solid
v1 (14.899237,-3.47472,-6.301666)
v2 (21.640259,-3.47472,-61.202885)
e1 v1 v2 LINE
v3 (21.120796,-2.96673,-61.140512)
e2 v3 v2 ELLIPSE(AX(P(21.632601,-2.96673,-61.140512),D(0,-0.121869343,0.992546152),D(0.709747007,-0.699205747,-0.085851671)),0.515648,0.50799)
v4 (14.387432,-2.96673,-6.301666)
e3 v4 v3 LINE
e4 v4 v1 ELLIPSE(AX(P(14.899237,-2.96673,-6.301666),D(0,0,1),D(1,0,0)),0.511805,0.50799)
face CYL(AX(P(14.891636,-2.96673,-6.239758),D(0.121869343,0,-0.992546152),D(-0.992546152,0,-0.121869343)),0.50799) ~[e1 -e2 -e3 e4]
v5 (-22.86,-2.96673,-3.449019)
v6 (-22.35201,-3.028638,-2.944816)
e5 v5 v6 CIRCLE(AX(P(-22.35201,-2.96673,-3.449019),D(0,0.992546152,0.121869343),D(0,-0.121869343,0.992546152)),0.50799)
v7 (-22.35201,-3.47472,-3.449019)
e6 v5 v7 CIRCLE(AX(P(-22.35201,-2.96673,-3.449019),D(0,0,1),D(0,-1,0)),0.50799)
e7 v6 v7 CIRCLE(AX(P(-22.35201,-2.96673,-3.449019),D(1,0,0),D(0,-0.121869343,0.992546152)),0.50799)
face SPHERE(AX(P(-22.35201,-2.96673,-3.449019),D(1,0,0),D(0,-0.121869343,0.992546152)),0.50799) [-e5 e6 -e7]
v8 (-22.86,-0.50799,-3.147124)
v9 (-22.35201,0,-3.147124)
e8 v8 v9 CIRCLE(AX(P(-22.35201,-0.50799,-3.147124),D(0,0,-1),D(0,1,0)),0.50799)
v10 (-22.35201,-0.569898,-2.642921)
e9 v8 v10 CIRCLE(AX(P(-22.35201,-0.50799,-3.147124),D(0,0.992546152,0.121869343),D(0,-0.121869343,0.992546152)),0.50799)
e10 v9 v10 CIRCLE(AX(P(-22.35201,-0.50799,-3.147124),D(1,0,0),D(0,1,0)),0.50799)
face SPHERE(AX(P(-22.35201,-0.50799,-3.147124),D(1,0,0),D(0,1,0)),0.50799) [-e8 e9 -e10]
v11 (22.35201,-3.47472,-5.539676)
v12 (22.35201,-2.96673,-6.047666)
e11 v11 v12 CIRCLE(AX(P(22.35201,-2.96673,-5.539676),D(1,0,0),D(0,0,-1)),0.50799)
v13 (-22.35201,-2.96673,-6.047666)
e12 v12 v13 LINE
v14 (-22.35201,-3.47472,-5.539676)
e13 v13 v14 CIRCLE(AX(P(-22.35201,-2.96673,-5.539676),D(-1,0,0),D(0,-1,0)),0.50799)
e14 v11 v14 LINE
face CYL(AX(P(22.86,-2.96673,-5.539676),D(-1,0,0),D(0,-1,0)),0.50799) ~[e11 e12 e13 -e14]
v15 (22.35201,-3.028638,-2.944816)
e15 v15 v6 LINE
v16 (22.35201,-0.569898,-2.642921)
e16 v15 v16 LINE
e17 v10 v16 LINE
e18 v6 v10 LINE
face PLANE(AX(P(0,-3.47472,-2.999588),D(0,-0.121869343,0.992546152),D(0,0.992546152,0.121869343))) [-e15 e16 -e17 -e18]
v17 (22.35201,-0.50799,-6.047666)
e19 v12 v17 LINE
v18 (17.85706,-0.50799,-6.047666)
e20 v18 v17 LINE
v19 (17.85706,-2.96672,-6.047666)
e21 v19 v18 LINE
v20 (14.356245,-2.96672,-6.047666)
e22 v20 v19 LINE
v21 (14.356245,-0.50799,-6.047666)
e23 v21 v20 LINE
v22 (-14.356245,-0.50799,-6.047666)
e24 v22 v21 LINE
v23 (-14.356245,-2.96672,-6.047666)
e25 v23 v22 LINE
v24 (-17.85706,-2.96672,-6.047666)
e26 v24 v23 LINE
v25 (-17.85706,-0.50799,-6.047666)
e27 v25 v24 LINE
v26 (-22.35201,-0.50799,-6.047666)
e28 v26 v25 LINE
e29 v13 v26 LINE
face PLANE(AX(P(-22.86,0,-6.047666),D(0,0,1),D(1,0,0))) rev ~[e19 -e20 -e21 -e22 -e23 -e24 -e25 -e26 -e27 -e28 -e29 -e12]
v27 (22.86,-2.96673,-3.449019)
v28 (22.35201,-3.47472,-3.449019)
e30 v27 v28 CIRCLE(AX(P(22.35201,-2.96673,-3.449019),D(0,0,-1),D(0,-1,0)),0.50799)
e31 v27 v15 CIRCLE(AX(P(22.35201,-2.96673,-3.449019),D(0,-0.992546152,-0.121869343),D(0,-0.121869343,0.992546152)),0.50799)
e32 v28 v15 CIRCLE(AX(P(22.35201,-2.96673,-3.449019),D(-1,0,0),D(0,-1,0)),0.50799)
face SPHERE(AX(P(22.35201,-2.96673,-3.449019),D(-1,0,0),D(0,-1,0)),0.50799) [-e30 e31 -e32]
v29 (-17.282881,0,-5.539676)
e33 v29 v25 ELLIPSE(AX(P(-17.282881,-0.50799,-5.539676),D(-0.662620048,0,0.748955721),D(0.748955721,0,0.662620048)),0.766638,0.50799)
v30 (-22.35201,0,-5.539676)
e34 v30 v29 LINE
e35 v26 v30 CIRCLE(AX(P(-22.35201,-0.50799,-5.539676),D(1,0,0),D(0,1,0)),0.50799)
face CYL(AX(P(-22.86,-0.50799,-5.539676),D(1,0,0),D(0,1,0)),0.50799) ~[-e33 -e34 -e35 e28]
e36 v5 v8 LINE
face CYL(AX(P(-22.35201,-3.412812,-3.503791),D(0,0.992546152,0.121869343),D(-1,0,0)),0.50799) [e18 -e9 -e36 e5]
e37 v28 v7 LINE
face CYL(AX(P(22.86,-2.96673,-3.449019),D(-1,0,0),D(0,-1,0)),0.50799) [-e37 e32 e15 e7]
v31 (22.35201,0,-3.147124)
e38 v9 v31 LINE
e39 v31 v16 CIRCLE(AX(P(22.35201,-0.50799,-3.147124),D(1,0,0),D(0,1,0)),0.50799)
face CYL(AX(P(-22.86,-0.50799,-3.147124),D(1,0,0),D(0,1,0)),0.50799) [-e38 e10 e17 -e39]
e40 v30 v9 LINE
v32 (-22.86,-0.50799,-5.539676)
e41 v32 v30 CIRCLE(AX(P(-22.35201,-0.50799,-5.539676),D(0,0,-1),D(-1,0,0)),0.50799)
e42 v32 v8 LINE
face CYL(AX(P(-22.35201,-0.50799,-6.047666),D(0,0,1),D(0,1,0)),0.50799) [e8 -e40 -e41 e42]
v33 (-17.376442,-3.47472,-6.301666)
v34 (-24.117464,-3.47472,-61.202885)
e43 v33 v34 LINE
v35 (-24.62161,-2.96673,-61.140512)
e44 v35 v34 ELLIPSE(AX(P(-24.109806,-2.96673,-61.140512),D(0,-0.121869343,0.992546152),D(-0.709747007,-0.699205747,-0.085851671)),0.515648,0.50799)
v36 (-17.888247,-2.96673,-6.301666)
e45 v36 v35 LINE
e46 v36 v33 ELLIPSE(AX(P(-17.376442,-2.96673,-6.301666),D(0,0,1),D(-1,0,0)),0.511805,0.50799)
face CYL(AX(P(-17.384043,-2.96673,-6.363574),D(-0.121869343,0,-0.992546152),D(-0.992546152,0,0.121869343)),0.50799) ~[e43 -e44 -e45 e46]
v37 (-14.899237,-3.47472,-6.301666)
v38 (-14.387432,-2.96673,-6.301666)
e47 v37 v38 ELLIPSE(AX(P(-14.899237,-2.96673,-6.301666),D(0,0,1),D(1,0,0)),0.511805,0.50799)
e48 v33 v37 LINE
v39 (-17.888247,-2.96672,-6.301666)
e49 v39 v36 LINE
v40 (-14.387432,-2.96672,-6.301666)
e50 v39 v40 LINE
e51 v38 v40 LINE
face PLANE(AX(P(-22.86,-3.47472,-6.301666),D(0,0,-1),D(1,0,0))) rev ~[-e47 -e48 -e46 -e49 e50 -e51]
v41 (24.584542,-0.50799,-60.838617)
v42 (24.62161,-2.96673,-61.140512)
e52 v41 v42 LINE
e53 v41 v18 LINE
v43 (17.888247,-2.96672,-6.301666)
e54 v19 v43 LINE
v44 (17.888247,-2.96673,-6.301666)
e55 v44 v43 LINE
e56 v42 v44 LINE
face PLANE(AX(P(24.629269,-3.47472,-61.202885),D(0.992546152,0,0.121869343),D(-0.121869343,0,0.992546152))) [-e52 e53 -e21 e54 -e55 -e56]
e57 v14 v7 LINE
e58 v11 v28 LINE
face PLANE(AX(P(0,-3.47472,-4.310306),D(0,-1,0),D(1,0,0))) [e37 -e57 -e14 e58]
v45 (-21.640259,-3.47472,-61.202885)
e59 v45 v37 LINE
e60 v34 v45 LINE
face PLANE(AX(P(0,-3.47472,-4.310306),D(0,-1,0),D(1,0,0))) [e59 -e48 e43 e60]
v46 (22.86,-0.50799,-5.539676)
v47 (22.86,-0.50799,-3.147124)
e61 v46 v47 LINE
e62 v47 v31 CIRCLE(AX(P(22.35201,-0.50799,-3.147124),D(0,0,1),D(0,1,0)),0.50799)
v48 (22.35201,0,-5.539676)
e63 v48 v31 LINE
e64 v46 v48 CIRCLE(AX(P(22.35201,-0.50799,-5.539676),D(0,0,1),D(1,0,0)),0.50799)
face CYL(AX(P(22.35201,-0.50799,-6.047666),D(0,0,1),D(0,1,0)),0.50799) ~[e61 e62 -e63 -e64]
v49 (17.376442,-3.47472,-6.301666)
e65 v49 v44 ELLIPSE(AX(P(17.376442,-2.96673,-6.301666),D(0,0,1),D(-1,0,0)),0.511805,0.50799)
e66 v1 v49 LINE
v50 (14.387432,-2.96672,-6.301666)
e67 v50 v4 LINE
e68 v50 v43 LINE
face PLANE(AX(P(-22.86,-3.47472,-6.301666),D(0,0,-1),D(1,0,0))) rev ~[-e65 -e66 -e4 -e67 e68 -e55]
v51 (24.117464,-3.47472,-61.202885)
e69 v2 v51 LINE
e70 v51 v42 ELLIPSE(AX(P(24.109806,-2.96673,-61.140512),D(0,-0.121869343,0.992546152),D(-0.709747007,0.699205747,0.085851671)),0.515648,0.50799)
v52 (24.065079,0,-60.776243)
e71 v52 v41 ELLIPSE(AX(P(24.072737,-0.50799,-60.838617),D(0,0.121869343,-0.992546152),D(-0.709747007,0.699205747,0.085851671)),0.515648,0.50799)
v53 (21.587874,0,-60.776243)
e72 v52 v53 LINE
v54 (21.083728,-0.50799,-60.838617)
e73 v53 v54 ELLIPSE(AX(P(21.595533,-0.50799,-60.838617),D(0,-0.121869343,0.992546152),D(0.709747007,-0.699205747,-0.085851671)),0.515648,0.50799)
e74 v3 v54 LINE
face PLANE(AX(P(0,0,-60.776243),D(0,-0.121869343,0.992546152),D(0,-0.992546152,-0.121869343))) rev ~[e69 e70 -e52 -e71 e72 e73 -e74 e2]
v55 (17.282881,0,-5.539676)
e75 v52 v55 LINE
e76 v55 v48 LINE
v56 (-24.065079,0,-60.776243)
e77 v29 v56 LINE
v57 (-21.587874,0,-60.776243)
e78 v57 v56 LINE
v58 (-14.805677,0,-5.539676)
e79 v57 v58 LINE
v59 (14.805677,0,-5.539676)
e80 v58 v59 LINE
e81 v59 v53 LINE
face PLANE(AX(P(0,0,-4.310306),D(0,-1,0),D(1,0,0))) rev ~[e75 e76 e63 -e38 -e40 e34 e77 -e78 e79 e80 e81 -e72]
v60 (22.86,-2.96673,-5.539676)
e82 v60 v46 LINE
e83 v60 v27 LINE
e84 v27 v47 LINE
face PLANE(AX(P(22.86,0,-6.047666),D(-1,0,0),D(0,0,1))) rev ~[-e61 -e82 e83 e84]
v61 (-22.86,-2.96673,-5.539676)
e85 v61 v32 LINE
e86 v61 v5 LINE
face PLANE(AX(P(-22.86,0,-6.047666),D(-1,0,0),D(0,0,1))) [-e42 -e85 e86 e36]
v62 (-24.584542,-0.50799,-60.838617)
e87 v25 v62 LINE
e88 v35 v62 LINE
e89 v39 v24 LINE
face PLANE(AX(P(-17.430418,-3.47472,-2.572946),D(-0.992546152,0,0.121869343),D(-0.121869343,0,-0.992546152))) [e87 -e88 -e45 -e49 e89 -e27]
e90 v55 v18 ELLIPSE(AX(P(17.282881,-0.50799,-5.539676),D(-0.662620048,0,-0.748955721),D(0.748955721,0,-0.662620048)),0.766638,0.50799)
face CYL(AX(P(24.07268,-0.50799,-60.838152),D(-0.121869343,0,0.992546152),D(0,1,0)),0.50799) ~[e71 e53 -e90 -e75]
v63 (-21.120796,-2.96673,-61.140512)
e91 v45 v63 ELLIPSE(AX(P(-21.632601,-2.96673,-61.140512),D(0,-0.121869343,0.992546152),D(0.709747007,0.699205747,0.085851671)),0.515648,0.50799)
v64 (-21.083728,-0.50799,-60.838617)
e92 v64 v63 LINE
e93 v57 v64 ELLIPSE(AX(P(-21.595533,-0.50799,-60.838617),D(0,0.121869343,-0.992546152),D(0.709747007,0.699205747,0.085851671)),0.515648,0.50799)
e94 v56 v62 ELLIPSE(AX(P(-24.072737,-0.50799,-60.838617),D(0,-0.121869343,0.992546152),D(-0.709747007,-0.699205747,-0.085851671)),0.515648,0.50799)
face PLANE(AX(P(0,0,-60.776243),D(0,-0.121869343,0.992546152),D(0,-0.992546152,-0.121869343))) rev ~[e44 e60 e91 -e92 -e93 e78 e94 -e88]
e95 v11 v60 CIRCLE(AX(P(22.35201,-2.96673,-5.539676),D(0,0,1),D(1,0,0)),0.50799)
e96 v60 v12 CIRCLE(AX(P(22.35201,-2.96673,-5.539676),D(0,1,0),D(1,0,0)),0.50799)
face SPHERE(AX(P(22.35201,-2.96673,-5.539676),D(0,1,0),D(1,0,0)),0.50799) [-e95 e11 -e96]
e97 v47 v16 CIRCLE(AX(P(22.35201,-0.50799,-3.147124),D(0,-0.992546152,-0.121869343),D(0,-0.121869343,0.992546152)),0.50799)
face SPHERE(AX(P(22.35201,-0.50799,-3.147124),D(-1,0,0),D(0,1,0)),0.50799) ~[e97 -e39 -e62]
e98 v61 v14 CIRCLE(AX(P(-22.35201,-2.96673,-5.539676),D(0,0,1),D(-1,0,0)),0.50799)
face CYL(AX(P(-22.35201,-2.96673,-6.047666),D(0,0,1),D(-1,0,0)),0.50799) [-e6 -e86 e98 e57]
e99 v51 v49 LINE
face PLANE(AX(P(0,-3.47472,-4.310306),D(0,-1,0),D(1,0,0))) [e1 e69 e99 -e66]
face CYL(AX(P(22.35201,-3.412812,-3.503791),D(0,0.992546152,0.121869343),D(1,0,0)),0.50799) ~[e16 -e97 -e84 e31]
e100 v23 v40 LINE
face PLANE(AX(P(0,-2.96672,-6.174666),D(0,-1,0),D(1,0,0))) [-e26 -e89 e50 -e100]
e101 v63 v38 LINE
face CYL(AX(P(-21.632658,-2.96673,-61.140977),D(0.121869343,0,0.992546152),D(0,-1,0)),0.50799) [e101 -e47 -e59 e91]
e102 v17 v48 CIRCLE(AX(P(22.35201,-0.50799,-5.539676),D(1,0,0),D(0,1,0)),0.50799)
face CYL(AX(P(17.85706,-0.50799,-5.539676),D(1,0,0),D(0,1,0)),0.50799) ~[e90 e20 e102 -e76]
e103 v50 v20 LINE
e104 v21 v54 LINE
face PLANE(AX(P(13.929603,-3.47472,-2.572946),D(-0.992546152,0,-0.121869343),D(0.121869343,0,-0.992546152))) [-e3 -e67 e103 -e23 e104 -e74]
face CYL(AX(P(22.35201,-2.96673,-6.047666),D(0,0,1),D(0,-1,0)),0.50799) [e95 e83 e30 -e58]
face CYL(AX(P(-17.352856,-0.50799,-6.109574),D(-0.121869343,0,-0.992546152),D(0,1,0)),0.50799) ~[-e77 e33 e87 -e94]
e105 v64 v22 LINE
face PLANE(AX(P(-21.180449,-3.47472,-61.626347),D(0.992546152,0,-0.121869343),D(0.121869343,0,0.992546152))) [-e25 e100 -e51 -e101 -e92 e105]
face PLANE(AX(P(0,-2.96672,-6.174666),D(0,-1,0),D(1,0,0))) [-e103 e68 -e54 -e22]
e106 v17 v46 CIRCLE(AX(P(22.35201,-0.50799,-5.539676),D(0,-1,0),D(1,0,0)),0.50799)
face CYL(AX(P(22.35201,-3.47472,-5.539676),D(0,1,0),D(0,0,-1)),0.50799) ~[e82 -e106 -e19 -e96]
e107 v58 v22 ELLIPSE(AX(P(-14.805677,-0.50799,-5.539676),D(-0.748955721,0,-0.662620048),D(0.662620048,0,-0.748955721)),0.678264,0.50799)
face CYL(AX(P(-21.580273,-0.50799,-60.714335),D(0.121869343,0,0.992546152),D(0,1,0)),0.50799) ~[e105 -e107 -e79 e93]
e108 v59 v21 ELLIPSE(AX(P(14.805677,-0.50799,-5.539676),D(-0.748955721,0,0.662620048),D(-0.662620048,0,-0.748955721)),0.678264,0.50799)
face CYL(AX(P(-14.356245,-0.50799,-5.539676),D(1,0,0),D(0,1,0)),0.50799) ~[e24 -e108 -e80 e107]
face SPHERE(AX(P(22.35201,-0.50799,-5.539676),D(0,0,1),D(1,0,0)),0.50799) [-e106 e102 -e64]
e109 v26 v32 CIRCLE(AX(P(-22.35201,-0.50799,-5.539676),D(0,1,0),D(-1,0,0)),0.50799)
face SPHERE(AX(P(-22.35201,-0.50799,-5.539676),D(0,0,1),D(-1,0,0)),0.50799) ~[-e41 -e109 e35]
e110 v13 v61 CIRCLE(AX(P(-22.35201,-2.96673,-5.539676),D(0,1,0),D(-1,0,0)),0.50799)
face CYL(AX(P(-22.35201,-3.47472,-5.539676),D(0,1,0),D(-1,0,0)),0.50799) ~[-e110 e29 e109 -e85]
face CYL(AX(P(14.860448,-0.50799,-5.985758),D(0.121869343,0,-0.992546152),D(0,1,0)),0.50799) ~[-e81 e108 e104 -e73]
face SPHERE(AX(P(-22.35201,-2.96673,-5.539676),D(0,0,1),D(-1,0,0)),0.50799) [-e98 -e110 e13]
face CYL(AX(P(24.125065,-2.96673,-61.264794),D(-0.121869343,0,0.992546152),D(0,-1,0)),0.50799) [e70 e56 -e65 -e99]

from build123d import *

# Parameters (mm, degrees)
F0_W     = 45.72
F0_H     = 3.47472
F1_DEPTH = 3.47472
F3_DEPTH = 3.47472
F5_DEPTH = 38.1
F6_W     = 45.72
F6_H     = 0.254
F7_DEPTH = 0.508
F8_R     = 0.50799


# Not quite as in the source:
# - a fillet or chamfer is up to 0.001 mm smaller than in the source, because OpenCascade refuses the exact size


with BuildPart() as f1:
    # F0 (on Front) → F1 (new body)
    with BuildSketch(Plane.XZ):
        with Locations((0, -4.3103059118)):
            Rectangle(F0_W, F0_H)
    extrude(amount=F1_DEPTH)

    # F2 (on face) → F3 (join)
    with BuildSketch(Plane.XZ.offset(3.47472)):
        Polygon((-13.929602997, -2.5729459118), (-17.4304175377, -2.5729459118), (-24.6292689013, -61.2028853004), (-21.1804489373, -61.6263471453), align=None)
        Polygon((21.1804489373, -61.6263471453), (24.6292689013, -61.2028853004), (17.4304175377, -2.5729459118), (13.929602997, -2.5729459118), align=None)
    extrude(amount=-F3_DEPTH)

    # F4 (on Right) → F5 (cut, symmetric)
    with BuildSketch(Plane.YZ):
        Polygon((-3.47472, -2.9995878813), (0, -2.5729459118), (-3.47472, -2.5729459118), align=None)
        Polygon((0, -60.7762433309), (-3.47472, -61.2028853004), (-3.47472, -61.962287873), (0, -61.962287873), align=None)
    extrude(amount=F5_DEPTH, both=True, mode=Mode.SUBTRACT)

    # F6 (on face) → F7 (cut)
    with BuildSketch(Plane.XZ.offset(3.47472)):
        with Locations((0, -6.1746659118)):
            Rectangle(F6_W, F6_H)
    extrude(amount=-F7_DEPTH, mode=Mode.SUBTRACT)

    # F8 (radius 0.508 in the source; OpenCascade refuses exactly that, so slightly less here)
    f8_edges = [f1.edges().sort_by_distance(p)[0] for p in [
        (0, -3.47472, -2.999588),
        (22.86, 0, -4.310306),
        (22.86, -1.73736, -6.047666),
        (22.86, -3.47472, -4.523627),
        (22.86, -1.73736, -2.786267),
        (21.258758, -3.47472, -33.752276),
        (-17.757943, -3.47472, -33.752276),
        (-21.258758, -3.47472, -33.752276),
        (-22.86, 0, -4.310306),
        (-22.86, -1.73736, -2.786267),
        (-22.86, -3.47472, -4.523627),
        (-22.86, -1.73736, -6.047666),
        (17.757943, -3.47472, -33.752276),
        (20.35853, 0, -6.047666),
        (17.716157, 0, -33.411955),
        (0, 0, -6.047666),
        (-20.35853, 0, -6.047666),
        (-21.216972, 0, -33.411955),
        (-17.716157, 0, -33.411955),
        (21.216972, 0, -33.411955),
        (0, -3.47472, -6.047666),
        (0, 0, -2.572946),
    ]]
    fillet(f8_edges, radius=F8_R)


solid = f1.part
